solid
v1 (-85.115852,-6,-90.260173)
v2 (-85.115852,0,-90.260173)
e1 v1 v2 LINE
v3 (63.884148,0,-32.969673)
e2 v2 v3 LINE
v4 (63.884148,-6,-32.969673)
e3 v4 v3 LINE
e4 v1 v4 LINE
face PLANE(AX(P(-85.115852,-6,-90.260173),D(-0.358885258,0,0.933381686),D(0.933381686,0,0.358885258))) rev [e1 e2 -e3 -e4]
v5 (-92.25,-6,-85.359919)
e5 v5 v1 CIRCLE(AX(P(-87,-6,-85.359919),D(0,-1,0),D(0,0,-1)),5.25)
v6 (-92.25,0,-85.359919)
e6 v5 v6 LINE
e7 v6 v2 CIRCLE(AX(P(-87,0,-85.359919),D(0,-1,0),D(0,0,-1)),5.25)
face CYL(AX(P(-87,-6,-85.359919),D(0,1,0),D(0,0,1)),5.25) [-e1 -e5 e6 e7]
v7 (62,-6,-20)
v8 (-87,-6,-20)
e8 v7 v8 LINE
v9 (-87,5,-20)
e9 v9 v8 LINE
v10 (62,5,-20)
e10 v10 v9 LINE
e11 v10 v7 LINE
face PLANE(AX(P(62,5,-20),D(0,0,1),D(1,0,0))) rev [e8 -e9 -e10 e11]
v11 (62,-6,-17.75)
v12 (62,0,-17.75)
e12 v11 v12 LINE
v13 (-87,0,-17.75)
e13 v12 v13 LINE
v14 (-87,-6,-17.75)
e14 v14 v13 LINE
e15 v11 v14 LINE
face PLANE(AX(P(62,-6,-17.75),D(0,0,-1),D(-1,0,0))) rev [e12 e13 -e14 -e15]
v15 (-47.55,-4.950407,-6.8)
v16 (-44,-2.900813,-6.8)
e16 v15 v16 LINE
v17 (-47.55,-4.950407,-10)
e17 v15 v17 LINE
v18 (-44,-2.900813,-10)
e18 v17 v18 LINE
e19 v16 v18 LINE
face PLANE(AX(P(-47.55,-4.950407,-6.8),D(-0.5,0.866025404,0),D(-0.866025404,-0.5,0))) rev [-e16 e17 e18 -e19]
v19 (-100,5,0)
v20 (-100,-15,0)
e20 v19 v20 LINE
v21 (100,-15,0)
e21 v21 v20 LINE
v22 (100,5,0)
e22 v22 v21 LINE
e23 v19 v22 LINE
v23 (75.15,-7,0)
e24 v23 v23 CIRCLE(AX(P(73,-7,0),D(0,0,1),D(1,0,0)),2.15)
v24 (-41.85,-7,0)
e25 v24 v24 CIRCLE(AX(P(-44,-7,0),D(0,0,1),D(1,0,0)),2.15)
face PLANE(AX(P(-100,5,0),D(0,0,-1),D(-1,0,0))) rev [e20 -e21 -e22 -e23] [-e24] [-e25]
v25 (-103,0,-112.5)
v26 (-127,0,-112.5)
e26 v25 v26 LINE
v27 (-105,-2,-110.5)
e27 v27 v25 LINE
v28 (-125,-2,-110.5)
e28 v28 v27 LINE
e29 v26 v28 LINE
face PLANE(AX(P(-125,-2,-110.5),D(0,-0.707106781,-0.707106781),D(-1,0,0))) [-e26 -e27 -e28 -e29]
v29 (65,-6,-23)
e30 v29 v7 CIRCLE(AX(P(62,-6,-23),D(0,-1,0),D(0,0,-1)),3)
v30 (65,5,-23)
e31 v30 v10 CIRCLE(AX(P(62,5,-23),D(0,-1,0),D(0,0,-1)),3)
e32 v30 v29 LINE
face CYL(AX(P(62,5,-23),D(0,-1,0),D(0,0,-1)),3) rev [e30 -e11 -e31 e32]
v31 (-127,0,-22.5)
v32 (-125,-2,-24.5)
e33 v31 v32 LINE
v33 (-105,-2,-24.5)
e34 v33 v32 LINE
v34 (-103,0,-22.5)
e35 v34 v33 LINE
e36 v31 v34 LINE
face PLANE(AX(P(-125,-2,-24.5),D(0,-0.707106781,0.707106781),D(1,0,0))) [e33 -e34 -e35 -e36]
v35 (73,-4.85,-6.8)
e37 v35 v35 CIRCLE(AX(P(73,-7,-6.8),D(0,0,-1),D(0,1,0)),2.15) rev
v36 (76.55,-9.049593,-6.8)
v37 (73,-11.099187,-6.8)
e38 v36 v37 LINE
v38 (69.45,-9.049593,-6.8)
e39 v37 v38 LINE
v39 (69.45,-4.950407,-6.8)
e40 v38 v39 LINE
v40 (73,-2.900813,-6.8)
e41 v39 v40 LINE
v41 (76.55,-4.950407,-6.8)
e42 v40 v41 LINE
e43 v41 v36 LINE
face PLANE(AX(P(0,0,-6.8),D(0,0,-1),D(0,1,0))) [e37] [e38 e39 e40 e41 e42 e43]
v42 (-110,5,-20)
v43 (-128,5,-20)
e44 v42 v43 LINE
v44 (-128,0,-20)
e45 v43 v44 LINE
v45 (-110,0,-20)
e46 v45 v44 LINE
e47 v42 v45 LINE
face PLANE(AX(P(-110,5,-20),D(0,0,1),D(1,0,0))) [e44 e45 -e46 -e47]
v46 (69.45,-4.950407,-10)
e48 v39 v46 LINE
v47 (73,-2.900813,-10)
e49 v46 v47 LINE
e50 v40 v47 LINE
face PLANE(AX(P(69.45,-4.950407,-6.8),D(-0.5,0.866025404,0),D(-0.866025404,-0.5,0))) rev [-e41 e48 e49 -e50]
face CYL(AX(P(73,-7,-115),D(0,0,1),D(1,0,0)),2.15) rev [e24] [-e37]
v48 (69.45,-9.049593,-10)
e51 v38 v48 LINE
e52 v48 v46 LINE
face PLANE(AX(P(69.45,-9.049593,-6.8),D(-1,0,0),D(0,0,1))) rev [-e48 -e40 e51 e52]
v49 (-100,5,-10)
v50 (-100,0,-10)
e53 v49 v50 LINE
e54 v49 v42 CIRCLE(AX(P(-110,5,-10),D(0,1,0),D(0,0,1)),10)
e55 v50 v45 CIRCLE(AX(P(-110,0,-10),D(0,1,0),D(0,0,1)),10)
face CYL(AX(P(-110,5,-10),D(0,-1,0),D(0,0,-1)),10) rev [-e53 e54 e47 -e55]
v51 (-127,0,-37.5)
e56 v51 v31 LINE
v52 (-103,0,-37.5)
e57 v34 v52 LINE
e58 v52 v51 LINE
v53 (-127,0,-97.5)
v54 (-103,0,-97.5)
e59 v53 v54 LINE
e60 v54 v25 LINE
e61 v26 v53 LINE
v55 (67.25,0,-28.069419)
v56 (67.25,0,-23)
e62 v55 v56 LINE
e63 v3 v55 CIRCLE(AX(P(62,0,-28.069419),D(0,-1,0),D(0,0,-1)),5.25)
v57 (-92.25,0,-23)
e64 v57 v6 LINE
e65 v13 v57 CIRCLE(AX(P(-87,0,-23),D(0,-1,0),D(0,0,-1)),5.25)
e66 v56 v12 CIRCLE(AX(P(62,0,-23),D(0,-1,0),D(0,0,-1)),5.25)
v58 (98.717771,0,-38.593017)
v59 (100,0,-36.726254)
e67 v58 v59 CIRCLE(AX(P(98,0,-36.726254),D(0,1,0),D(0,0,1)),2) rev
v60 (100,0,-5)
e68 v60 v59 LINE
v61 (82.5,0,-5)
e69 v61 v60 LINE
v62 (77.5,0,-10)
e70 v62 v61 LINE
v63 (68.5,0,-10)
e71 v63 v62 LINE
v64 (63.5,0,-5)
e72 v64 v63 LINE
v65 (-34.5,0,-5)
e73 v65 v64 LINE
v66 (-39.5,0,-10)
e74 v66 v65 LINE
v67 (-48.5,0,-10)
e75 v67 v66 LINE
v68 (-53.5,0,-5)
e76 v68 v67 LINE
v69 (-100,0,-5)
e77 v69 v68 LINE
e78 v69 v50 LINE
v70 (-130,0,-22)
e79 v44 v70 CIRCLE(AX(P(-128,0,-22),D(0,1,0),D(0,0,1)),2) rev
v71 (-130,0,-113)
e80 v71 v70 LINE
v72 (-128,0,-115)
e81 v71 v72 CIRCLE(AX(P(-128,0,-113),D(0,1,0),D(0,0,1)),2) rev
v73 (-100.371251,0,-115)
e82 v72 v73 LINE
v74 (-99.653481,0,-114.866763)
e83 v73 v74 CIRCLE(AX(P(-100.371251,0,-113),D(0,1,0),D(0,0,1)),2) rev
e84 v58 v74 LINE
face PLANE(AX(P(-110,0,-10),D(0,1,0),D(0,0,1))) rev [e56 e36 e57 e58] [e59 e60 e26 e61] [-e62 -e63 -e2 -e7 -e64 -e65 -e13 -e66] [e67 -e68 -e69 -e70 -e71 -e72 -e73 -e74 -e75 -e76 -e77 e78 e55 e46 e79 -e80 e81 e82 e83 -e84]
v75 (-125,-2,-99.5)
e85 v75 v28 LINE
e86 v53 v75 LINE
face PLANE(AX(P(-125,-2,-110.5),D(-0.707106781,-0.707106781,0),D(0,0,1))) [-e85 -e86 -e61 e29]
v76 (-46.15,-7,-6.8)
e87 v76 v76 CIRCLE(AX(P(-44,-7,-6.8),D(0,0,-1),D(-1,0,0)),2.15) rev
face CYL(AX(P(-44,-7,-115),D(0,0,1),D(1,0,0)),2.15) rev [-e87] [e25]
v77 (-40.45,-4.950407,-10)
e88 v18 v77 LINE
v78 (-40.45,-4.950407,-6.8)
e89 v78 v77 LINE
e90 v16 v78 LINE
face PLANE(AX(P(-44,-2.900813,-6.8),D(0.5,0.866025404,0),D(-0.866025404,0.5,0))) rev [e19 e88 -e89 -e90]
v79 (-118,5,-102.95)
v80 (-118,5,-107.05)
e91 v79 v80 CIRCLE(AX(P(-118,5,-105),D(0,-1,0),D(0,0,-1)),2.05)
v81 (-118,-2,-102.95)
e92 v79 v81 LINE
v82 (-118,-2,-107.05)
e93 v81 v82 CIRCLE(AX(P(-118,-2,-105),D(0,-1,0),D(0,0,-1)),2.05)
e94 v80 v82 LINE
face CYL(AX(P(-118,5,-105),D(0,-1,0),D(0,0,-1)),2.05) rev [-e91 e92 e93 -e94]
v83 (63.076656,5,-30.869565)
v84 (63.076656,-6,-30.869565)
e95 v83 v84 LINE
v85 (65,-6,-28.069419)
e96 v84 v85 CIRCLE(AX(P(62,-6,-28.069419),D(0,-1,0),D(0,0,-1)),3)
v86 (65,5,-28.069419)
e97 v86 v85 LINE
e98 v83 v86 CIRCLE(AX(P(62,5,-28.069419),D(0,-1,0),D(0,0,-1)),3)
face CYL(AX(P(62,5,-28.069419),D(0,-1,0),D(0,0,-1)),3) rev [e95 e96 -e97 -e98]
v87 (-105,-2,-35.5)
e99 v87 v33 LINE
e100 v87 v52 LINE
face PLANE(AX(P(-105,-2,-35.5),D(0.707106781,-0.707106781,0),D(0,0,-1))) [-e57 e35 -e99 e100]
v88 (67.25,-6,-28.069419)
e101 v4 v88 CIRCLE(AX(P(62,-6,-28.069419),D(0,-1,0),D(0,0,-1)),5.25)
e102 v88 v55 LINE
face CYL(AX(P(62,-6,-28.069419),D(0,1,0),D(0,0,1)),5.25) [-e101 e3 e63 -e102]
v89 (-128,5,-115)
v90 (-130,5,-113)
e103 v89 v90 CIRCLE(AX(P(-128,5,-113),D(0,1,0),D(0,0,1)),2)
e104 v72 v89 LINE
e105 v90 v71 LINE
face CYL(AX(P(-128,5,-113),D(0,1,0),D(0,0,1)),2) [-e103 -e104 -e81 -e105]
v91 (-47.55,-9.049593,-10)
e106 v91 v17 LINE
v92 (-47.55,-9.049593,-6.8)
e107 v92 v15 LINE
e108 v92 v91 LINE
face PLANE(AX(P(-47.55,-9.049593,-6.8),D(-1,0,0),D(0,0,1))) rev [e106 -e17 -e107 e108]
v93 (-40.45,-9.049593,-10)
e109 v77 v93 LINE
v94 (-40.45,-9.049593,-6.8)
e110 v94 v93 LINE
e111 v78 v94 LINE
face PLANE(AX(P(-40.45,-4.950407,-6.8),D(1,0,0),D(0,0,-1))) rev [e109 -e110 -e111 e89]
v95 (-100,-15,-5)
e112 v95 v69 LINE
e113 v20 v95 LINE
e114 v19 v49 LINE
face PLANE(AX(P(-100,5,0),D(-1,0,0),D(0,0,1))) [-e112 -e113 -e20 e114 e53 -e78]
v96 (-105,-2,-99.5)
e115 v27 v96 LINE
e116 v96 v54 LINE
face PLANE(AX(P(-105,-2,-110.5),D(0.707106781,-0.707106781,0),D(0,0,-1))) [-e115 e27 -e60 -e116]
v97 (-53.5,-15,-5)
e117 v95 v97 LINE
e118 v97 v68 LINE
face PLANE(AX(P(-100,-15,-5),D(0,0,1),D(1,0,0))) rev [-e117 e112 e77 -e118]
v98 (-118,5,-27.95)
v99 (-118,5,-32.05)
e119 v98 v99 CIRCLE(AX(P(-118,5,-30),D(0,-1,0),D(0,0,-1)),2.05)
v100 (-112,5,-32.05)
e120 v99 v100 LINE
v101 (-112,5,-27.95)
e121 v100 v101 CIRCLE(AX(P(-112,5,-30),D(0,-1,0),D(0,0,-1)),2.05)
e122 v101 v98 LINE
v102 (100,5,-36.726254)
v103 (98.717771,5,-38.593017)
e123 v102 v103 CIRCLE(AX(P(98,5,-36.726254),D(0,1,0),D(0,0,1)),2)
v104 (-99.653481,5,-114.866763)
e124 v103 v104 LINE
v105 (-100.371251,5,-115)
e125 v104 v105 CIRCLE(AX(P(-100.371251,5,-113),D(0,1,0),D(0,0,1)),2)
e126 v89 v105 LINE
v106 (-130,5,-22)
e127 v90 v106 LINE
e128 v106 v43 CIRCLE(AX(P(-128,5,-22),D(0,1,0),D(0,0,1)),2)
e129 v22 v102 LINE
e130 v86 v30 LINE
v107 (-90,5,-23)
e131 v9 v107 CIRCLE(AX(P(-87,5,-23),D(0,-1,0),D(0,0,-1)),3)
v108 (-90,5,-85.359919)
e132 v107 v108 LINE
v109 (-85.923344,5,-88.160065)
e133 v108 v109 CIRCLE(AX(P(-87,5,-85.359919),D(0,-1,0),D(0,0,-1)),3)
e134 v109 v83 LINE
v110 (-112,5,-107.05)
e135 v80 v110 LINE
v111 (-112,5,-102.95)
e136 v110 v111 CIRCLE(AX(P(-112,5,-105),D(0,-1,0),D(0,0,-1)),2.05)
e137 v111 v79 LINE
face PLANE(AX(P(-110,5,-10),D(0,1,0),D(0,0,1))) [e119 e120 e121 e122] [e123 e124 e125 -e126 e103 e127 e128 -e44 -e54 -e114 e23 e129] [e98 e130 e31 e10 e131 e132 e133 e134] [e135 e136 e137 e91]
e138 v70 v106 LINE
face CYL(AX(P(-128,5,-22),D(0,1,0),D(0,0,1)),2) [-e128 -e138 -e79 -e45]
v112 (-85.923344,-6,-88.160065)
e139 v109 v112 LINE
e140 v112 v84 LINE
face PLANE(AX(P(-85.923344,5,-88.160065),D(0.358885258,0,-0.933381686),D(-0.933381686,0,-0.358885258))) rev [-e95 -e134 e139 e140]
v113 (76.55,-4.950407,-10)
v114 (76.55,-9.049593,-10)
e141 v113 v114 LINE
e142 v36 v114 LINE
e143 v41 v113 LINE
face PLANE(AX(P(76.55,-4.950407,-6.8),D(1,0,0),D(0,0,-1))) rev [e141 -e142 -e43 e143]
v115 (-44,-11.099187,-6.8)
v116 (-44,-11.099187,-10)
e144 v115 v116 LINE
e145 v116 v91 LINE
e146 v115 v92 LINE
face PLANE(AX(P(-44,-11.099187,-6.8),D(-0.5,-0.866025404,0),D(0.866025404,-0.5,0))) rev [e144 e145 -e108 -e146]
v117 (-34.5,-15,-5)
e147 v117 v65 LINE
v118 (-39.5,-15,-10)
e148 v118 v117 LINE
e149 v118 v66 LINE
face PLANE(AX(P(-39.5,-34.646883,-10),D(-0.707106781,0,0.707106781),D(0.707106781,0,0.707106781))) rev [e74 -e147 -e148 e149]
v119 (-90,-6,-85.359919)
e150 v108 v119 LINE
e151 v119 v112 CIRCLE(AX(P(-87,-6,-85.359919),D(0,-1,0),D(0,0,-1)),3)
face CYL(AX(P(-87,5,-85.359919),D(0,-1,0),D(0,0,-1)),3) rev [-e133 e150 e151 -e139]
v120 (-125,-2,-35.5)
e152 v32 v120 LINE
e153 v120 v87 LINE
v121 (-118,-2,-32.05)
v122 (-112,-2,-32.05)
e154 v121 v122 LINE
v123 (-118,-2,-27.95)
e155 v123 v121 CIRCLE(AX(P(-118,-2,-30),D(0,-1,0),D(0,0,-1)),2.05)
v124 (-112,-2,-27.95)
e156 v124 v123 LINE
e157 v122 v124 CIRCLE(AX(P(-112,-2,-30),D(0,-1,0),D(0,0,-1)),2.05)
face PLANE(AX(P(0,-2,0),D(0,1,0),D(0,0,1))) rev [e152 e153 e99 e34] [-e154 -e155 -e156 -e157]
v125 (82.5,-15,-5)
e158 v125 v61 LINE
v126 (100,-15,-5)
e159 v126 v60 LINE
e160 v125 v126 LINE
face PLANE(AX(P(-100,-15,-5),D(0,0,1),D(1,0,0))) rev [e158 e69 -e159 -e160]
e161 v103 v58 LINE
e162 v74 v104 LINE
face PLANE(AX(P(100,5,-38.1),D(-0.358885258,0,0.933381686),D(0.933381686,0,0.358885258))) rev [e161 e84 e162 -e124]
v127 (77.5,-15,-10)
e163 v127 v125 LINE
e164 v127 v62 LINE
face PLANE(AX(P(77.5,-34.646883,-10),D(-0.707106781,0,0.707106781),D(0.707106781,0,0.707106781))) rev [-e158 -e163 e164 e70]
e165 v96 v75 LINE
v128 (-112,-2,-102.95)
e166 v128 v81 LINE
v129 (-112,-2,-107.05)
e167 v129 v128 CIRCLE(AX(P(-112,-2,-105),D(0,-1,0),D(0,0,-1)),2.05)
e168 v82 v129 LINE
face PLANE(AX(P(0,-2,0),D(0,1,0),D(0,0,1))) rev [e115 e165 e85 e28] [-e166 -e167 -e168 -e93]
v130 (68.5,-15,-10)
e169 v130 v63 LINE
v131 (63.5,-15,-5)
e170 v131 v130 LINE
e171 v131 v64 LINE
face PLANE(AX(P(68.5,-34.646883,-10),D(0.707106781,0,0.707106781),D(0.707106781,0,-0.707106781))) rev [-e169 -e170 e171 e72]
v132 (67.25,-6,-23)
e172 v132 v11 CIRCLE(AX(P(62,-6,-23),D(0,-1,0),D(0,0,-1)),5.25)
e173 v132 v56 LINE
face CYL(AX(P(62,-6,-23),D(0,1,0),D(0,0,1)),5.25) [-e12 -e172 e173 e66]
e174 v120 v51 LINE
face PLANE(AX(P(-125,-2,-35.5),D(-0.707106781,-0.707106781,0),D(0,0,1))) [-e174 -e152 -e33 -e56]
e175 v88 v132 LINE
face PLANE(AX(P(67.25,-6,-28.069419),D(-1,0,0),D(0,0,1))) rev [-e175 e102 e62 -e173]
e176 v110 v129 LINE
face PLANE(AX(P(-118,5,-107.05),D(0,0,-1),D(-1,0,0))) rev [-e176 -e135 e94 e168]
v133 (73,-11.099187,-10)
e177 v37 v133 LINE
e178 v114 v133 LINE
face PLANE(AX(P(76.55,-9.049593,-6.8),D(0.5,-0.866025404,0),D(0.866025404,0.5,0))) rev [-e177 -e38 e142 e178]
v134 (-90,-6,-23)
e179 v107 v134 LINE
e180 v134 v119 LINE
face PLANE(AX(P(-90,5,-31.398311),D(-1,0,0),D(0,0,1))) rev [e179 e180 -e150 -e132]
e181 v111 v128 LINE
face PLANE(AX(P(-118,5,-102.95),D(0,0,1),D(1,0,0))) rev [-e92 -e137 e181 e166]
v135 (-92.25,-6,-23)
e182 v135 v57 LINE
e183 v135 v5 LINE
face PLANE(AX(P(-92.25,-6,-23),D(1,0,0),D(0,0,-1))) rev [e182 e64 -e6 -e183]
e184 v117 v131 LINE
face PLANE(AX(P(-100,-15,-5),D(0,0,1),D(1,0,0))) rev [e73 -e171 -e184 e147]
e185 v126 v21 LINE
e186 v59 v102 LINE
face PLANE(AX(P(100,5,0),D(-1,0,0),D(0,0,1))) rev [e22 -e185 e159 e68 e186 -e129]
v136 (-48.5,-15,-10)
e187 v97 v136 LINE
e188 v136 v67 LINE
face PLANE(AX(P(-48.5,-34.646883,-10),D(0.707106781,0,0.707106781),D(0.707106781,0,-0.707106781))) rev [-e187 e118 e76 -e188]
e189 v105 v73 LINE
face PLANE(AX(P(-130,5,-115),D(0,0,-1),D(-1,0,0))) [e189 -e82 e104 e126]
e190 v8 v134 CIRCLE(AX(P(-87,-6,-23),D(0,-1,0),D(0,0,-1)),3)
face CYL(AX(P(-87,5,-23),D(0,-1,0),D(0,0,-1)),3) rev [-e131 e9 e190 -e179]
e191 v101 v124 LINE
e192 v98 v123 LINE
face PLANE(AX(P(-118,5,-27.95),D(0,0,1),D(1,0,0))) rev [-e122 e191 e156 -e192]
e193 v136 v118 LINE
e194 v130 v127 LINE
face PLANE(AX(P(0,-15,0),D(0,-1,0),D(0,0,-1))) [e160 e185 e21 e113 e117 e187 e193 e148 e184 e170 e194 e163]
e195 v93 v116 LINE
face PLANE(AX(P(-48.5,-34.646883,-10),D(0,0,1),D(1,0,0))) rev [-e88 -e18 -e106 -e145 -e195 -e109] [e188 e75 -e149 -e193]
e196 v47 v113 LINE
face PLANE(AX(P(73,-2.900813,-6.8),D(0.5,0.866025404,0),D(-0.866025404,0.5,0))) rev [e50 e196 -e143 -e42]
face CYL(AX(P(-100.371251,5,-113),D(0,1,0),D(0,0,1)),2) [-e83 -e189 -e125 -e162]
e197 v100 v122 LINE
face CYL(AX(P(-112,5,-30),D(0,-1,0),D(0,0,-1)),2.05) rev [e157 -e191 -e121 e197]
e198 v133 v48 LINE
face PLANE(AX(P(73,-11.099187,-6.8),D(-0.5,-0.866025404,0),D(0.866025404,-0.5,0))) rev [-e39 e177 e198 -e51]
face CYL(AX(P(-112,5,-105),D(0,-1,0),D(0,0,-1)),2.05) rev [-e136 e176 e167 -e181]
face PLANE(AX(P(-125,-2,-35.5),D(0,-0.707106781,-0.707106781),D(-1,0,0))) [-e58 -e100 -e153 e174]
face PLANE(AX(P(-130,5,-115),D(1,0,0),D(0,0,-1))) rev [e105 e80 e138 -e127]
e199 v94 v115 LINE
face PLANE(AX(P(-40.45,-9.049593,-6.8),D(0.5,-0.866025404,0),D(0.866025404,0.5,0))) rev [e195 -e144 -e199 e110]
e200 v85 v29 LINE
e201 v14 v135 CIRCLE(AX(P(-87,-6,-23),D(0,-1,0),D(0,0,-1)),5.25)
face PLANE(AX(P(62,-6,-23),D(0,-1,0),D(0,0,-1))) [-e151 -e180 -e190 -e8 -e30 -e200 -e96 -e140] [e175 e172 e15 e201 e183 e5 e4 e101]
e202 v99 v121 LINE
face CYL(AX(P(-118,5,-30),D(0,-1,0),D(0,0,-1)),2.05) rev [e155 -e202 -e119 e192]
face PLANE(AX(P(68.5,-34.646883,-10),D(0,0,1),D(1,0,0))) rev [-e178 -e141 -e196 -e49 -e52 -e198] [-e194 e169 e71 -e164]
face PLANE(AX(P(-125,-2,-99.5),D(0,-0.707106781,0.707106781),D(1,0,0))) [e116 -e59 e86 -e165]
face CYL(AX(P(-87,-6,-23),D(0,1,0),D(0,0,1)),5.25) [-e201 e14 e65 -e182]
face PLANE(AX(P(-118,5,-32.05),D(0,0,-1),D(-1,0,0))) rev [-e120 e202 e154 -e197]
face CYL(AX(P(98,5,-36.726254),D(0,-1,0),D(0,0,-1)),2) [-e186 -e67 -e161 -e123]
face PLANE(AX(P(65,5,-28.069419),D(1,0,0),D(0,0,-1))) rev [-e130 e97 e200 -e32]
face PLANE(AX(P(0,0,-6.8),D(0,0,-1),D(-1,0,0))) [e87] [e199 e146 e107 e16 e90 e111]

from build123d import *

# Parameters (mm, degrees)
BOSS_EXTRUDE1_DEPTH = 5
SKETCH2_W           = 200
SKETCH2_H           = 5
BOSS_EXTRUDE2_DEPTH = 15
BOSS_EXTRUDE3_DEPTH = 15
SKETCH6_R           = 2.15
CUT_EXTRUDE2_DEPTH  = 175.212513902
CUT_EXTRUDE3_DEPTH  = 3.2
SKETCH9_W           = 20
SKETCH9_H           = 11
BOSS_EXTRUDE4_DEPTH = 2
CHAMFER1_SIZE       = 2
CUT_EXTRUDE4_DEPTH  = 175.051716452
CUT_EXTRUDE5_DEPTH  = 175.212513902
BOSS_EXTRUDE5_START = 6
BOSS_EXTRUDE5_DEPTH = 6
FILLET1_R           = 2


with BuildPart() as part:
    # Sketch1 → Boss-Extrude1 (new body)
    with BuildSketch(Plane(origin=(0, 0, 0), x_dir=(1, 0, 0), z_dir=(0, 1, 0))):
        with BuildLine():
            Line((-100, 0), (100, 0))
            Line((100, 0), (100, 38.1))
            Line((100, 38.1), (-100, 115))
            Line((-100, 115), (-130, 115))
            Line((-130, 115), (-130, 20))
            Line((-130, 20), (-110, 20))
            ThreePointArc((-110, 20), (-102.928932188, 17.071067812), (-100, 10))
            Line((-100, 10), (-100, 0))
        make_face()
    extrude(amount=BOSS_EXTRUDE1_DEPTH)

    # Sketch2 → Boss-Extrude2 (add)
    with BuildSketch(Plane.XZ):
        with Locations((0, -2.5)):
            Rectangle(SKETCH2_W, SKETCH2_H)
    extrude(amount=BOSS_EXTRUDE2_DEPTH)

    # Sketch5 → Boss-Extrude3 (add)
    with BuildSketch(Plane.XZ):
        Polygon((-53.5, -5), (-34.5, -5), (-39.5, -10), (-48.5, -10), align=None)
        Polygon((68.5, -10), (77.5, -10), (82.5, -5), (63.5, -5), align=None)
    extrude(amount=BOSS_EXTRUDE3_DEPTH)

    # Sketch6 → Cut-Extrude2 (cut, through all)
    with BuildSketch(Plane.XY):
        with Locations((-44, -7)):
            Circle(SKETCH6_R)
        with Locations((73, -7)):
            Circle(SKETCH6_R)
    extrude(amount=-CUT_EXTRUDE2_DEPTH, mode=Mode.SUBTRACT)

    # Sketch7 → Cut-Extrude3 (cut)
    with BuildSketch(Plane(origin=(0, 0, -10), x_dir=(-1, 0, 0), z_dir=(0, 0, -1))):
        Polygon((-73, -11.099186911), (-69.45, -9.049593456), (-69.45, -4.950406544), (-73, -2.900813089), (-76.55, -4.950406544), (-76.55, -9.049593456), align=None)
        Polygon((47.55, -9.049593456), (47.55, -4.950406544), (44, -2.900813089), (40.45, -4.950406544), (40.45, -9.049593456), (44, -11.099186911), align=None)
    extrude(amount=-CUT_EXTRUDE3_DEPTH, mode=Mode.SUBTRACT)

    # Sketch9 → Boss-Extrude4 (add)
    with BuildSketch(Plane.XZ):
        with Locations((-115, -30)):
            Rectangle(SKETCH9_W, SKETCH9_H)
        with Locations((-115, -105)):
            Rectangle(SKETCH9_W, SKETCH9_H)
    extrude(amount=BOSS_EXTRUDE4_DEPTH)

    # Chamfer1
    chamfer1_edges = [part.edges().sort_by_distance(p)[0] for p in [
        (-105, 0, -30),
        (-115, 0, -35.5),
        (-115, 0, -24.5),
        (-125, 0, -30),
        (-115, 0, -99.5),
        (-125, 0, -105),
        (-105, 0, -105),
        (-115, 0, -110.5),
    ]]
    chamfer(chamfer1_edges, length=CHAMFER1_SIZE - 0.0001)  # a hair under: the kernel refuses the full size

    # Sketch8 → Cut-Extrude4 (cut, through all)
    with BuildSketch(Plane.XZ.offset(2)):
        with BuildLine():
            Line((-118, -27.95), (-112, -27.95))
            ThreePointArc((-112, -27.95), (-109.95, -30), (-112, -32.05))
            Line((-112, -32.05), (-118, -32.05))
            ThreePointArc((-118, -32.05), (-120.05, -30), (-118, -27.95))
        make_face()
        with BuildLine():
            Line((-118, -102.95), (-112, -102.95))
            ThreePointArc((-112, -102.95), (-109.95, -105), (-112, -107.05))
            Line((-112, -107.05), (-118, -107.05))
            ThreePointArc((-118, -107.05), (-120.05, -105), (-118, -102.95))
        make_face()
    extrude(amount=-CUT_EXTRUDE4_DEPTH, mode=Mode.SUBTRACT)

    # Sketch10 → Cut-Extrude5 (cut, through all)
    with BuildSketch(Plane.XZ):
        with BuildLine():
            Line((-90, -31.398310884), (-90, -85.359919445))
            ThreePointArc((-90, -85.359919445), (-88.698533585, -87.832768745), (-85.923344225, -88.160064502))
            Line((-85.923344225, -88.160064502), (63.076655775, -30.869564502))
            ThreePointArc((63.076655775, -30.869564502), (64.4728493, -29.76795303), (65, -28.069419445))
            Line((65, -28.069419445), (65, -23))
            ThreePointArc((65, -23), (64.121320344, -20.878679656), (62, -20))
            Line((62, -20), (-87, -20))
            ThreePointArc((-87, -20), (-89.121320344, -20.878679656), (-90, -23))
            Line((-90, -23), (-90, -31.398310884))
        make_face()
    extrude(amount=-CUT_EXTRUDE5_DEPTH, mode=Mode.SUBTRACT)

    # Sketch11 → Boss-Extrude5 (add)
    with BuildSketch(Plane.XZ.offset(BOSS_EXTRUDE5_START)):
        with BuildLine():
            Line((62, -17.75), (-87, -17.75))
            ThreePointArc((-87, -17.75), (-90.712310601, -19.287689399), (-92.25, -23))
            Line((-92.25, -23), (-92.25, -85.359919445))
            ThreePointArc((-92.25, -85.359919445), (-89.972433773, -89.68740572), (-85.115852394, -90.260173296))
            Line((-85.115852394, -90.260173296), (63.884147606, -32.969673296))
            ThreePointArc((63.884147606, -32.969673296), (66.327486275, -31.041853218), (67.25, -28.069419445))
            Line((67.25, -28.069419445), (67.25, -23))
            ThreePointArc((67.25, -23), (65.712310601, -19.287689399), (62, -17.75))
        make_face()
        with BuildLine():
            Line((-90, -23), (-90, -85.359919445))
            ThreePointArc((-90, -85.359919445), (-88.698533585, -87.832768745), (-85.923344225, -88.160064502))
            Line((-85.923344225, -88.160064502), (63.076655775, -30.869564502))
            ThreePointArc((63.076655775, -30.869564502), (64.4728493, -29.76795303), (65, -28.069419445))
            Line((65, -28.069419445), (65, -23))
            ThreePointArc((65, -23), (64.121320344, -20.878679656), (62, -20))
            Line((62, -20), (-87, -20))
            ThreePointArc((-87, -20), (-89.121320344, -20.878679656), (-90, -23))
        make_face(mode=Mode.SUBTRACT)
    extrude(amount=-BOSS_EXTRUDE5_DEPTH)

    # Fillet1
    fillet1_edges = [part.edges().sort_by_distance(p)[0] for p in [
        (-130, 2.5, -115),
        (-130, 2.5, -20),
        (100, 2.5, -38.1),
        (-100, 2.5, -115),
    ]]
    fillet(fillet1_edges, radius=FILLET1_R)


solid = part.part
